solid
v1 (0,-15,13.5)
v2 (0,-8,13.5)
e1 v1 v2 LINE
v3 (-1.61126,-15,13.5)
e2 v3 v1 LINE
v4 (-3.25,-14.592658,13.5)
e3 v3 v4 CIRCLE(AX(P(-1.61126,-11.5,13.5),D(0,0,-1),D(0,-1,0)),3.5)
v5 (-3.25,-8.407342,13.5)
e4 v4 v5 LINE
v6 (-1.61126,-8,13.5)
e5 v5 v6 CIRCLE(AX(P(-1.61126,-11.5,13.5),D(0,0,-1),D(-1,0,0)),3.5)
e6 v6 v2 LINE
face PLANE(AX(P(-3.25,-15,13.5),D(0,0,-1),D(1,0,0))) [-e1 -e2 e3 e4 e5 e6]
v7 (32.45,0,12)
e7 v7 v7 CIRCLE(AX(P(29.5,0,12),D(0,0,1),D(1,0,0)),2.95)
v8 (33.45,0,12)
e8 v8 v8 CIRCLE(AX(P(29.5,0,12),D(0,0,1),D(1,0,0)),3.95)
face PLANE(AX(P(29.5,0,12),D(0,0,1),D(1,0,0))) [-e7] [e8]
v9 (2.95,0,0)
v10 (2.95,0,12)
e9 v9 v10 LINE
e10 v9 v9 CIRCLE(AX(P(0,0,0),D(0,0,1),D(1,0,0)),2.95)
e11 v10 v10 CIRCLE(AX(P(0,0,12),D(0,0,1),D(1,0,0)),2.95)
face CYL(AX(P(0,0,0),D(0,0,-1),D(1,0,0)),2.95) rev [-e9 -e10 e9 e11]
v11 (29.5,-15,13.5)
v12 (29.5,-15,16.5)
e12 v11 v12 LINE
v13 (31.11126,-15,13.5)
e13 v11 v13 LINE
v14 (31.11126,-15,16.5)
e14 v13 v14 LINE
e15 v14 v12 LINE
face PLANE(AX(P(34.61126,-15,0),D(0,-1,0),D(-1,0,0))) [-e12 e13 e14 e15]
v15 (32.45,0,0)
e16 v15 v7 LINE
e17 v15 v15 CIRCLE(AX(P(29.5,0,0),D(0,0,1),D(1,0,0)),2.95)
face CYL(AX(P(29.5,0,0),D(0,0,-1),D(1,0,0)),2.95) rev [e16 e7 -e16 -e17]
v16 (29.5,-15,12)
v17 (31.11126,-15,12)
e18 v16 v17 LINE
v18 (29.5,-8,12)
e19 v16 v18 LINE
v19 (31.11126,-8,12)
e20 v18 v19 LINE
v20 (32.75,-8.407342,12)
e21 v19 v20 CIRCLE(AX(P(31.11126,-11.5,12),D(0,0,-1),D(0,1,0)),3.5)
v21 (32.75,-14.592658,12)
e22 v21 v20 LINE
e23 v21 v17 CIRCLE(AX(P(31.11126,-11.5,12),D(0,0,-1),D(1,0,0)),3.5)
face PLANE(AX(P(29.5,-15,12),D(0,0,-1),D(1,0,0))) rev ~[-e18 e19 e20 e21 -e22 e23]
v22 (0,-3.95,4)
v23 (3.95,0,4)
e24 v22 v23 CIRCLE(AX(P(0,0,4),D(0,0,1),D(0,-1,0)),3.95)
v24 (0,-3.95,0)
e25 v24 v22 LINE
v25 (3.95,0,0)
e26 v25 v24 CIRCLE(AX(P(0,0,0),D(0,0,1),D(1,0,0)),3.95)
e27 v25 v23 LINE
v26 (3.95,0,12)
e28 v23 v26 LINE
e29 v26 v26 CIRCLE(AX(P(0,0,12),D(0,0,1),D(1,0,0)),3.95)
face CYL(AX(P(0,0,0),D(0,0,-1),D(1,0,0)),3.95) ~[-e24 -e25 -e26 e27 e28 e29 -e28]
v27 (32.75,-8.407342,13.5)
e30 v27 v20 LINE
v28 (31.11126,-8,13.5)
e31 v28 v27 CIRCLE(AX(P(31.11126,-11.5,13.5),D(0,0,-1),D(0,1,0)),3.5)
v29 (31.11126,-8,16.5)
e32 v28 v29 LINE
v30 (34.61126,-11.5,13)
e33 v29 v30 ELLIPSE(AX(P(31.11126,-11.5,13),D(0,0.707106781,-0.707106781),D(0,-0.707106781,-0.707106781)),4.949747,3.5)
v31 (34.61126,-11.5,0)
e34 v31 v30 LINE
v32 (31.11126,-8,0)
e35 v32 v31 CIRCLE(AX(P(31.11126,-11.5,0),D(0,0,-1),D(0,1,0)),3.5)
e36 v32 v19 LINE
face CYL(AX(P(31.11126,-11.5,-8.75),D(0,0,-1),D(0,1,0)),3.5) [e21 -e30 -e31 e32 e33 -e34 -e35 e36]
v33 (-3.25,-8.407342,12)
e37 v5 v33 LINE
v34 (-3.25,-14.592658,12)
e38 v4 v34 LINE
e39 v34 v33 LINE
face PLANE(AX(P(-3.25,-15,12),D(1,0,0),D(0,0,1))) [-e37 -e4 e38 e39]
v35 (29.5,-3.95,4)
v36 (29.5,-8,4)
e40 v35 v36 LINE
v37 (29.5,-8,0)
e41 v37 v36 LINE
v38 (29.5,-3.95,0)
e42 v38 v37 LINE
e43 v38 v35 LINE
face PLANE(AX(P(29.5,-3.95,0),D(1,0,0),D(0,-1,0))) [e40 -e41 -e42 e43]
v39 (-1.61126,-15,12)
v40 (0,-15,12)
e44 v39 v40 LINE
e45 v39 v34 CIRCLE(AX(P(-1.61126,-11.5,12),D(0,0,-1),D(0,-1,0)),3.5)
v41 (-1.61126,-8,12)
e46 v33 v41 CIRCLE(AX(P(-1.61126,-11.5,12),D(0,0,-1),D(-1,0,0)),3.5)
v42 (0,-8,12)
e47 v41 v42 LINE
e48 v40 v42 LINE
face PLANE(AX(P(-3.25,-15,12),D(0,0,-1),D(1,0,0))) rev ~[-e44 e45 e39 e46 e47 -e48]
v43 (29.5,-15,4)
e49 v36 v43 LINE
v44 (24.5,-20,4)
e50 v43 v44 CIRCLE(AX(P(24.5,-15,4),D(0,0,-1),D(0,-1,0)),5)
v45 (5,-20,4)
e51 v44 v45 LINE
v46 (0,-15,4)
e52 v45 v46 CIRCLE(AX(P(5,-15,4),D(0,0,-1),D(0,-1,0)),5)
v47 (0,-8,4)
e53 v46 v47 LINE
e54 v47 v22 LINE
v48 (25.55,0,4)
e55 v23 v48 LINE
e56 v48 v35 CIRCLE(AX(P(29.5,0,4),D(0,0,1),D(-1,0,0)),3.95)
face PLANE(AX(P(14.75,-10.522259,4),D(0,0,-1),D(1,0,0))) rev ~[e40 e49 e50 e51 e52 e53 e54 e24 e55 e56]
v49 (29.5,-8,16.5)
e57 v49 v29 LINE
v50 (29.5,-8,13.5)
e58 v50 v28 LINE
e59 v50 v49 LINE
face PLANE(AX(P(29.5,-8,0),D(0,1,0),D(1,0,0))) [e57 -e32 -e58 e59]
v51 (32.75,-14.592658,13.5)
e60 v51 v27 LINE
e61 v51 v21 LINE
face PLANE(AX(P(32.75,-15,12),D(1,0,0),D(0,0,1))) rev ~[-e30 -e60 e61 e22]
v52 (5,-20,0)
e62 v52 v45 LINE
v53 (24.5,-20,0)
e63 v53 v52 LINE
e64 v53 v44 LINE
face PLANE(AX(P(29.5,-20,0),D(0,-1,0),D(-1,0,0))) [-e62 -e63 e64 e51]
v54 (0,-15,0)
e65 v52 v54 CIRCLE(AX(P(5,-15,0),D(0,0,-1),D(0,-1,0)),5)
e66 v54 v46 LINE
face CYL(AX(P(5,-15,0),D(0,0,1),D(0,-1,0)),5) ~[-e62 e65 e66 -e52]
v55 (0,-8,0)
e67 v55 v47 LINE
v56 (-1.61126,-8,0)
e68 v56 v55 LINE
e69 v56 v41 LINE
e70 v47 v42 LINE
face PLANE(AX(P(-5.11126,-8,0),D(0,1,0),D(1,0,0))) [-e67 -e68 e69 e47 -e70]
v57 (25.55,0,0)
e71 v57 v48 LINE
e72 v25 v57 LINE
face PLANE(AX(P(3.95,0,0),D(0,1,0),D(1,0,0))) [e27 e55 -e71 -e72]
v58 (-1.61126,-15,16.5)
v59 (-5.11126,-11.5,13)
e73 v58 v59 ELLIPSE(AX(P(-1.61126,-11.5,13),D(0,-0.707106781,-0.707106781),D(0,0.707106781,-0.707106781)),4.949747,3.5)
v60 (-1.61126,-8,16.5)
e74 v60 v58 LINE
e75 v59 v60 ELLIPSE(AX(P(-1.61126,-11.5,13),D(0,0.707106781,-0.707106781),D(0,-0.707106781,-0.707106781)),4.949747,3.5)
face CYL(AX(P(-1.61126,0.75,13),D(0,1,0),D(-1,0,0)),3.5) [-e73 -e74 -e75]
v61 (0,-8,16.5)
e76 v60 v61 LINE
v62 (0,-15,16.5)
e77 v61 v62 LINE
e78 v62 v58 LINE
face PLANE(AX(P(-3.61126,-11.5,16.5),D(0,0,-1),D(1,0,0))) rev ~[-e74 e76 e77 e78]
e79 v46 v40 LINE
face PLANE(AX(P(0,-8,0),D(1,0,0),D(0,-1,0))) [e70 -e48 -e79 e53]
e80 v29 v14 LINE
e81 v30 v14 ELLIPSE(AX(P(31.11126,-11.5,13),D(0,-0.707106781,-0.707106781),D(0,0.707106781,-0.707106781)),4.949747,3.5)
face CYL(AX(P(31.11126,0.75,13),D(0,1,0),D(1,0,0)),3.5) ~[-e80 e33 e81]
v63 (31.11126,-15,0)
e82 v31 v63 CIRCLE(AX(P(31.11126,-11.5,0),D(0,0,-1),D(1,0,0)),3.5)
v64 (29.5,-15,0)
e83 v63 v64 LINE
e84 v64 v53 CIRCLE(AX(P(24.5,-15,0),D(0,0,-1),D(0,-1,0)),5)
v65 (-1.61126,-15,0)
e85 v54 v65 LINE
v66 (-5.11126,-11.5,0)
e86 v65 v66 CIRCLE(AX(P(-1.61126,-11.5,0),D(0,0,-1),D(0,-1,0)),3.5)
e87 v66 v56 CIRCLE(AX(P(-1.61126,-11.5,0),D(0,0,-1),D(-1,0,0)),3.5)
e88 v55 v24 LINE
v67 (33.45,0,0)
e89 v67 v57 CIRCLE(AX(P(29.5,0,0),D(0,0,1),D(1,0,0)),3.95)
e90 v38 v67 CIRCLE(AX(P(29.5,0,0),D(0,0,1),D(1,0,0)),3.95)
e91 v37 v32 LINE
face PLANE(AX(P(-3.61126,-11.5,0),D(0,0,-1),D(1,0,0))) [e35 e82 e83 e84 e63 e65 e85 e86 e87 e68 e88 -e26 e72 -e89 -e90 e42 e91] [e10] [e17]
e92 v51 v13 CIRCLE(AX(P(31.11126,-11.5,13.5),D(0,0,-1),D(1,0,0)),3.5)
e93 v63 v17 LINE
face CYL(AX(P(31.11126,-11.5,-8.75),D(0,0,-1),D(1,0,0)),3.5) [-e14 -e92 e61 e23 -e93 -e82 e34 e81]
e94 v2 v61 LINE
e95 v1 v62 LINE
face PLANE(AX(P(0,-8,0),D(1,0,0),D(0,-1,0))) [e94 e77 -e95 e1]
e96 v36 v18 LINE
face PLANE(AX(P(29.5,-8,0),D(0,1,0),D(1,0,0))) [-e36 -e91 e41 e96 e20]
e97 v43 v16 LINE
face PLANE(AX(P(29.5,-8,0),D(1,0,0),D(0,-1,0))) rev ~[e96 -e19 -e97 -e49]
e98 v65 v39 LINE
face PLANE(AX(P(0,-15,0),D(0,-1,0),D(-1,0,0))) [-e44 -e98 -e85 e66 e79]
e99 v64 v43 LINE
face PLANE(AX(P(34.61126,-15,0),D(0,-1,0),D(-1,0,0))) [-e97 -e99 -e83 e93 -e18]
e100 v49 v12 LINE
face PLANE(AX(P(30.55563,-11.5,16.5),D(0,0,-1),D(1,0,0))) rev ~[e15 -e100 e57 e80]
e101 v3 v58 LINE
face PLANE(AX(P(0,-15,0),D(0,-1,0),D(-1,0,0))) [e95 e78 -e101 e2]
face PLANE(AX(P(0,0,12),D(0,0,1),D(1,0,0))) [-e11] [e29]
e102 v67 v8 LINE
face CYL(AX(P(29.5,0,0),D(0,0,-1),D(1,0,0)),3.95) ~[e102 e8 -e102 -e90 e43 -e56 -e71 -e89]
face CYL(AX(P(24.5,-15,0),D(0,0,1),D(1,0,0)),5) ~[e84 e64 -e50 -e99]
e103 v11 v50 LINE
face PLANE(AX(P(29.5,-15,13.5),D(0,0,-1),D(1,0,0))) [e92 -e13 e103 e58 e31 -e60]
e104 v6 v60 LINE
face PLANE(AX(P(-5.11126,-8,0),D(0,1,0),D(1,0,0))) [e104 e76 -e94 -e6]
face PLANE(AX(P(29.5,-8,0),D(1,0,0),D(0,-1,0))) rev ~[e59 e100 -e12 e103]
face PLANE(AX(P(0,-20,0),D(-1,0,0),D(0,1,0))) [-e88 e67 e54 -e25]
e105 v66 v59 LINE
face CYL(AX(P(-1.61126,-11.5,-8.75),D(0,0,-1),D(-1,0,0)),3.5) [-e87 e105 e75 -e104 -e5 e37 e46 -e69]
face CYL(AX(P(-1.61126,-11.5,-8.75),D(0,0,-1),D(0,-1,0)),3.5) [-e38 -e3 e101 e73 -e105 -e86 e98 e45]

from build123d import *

# Parameters (mm, degrees)
F0_R         = 3.95
F0_R_2       = 2.95
F1_DEPTH     = 12
F3_DEPTH     = 4
F5_R         = 5
F6_W         = 3
F6_H         = 7
F6_W_2       = 2.1112600537
F7_DEPTH     = 16.5
F8_W         = 3.25
F8_H         = 1.5
F9_DEPTH     = 7
F10_T1_DEPTH = 34
F10_T3_DEPTH = 24.5


# Not quite as in the source:
# - a fillet or chamfer that OpenCascade refuses, or shapes differently, is made with other operations: its cross-section is extruded or revolved along the edge and cut away or added


with BuildPart() as f1:
    # F0 (on Top) → F1 (new body)
    with BuildSketch(Plane.XY):
        Circle(F0_R)
        Circle(F0_R_2, mode=Mode.SUBTRACT)
    extrude(amount=F1_DEPTH)


with BuildPart() as f1b:
    # F0 (on Top) → F1, piece 2 (new body)
    with BuildSketch(Plane.XY):
        with Locations((29.5, 0)):
            Circle(F0_R)
        with Locations((29.5, 0)):
            Circle(F0_R_2, mode=Mode.SUBTRACT)
    extrude(amount=F1_DEPTH)


with BuildPart() as f3:
    # F2 (on face) → F3 (new body)
    with BuildSketch(Plane(origin=(0, 0, 0), x_dir=(1, 0, 0), z_dir=(0, 0, -1))):
        with BuildLine():
            ThreePointArc((0, 3.95), (2.7930717857, 2.7930717857), (3.95, 0))
            Line((3.95, 0), (25.55, 0))
            ThreePointArc((25.55, 0), (26.7069282143, 2.7930717857), (29.5, 3.95))
            Line((29.5, 3.95), (29.5, 20))
            Line((29.5, 20), (0, 20))
            Line((0, 20), (0, 3.95))
        make_face()
    extrude(amount=-F3_DEPTH)

    # F4: union F1, F1b
    add(f1.part)
    add(f1b.part)

    # F5
    f5_edges = [f3.edges().sort_by_distance(p)[0] for p in [
        (0, -20, 2),
        (29.5, -20, 2),
    ]]
    fillet(f5_edges, radius=F5_R)

    # F6 (on face) → F7 (join)
    with BuildSketch(Plane(origin=(0, 0, 0), x_dir=(1, 0, 0), z_dir=(0, 0, -1))):
        with Locations((-3.6112600537, 11.5)):
            Rectangle(F6_W, F6_H)
        with Locations((-1.0556300269, 11.5)):
            Rectangle(F6_W_2, F6_H)
        with Locations((30.5556300269, 11.5)):
            Rectangle(F6_W_2, F6_H)
        with Locations((33.1112600537, 11.5)):
            Rectangle(F6_W, F6_H)
    extrude(amount=-F7_DEPTH)

    # F8 (on face) → F9 (cut, through all)
    with BuildSketch(Plane.XZ.offset(15)):
        with Locations((-1.625, 12.75)):
            Rectangle(F8_W, F8_H)
        with Locations((31.125, 12.75)):
            Rectangle(F8_W, F8_H)
    extrude(amount=-F9_DEPTH, mode=Mode.SUBTRACT)

    # F10: fillet of radius 3.5 on 6 edges, made by hand

    # F10_s2 → F10_t1 (cut)
    with BuildSketch(Plane.XY.offset(-8.75)):
        with BuildLine():
            ThreePointArc((-1.6112600537, -15), (-4.0861337879, -13.9748737342), (-5.1112600537, -11.5))
            Line((-5.1112600537, -11.5), (-5.1112600537, -15))
            Line((-5.1112600537, -15), (-1.6112600537, -15))
        make_face()
        with BuildLine():
            ThreePointArc((-5.1112600537, -11.5), (-4.0861337879, -9.0251262658), (-1.6112600537, -8))
            Line((-1.6112600537, -8), (-5.1112600537, -8))
            Line((-5.1112600537, -8), (-5.1112600537, -11.5))
        make_face()
        with BuildLine():
            ThreePointArc((34.6112600537, -11.5), (33.5861337879, -13.9748737342), (31.1112600537, -15))
            Line((31.1112600537, -15), (34.6112600537, -15))
            Line((34.6112600537, -15), (34.6112600537, -11.5))
        make_face()
        with BuildLine():
            ThreePointArc((31.1112600537, -8), (33.5861337879, -9.0251262658), (34.6112600537, -11.5))
            Line((34.6112600537, -11.5), (34.6112600537, -8))
            Line((34.6112600537, -8), (31.1112600537, -8))
        make_face()
    extrude(amount=F10_T1_DEPTH, mode=Mode.SUBTRACT)

    # F10_s4 → F10_t3 (cut)
    with BuildSketch(Plane.XZ.offset(-0.75)):
        with BuildLine():
            ThreePointArc((34.6112600537, 13), (33.5861337879, 15.4748737342), (31.1112600537, 16.5))
            Line((31.1112600537, 16.5), (34.6112600537, 16.5))
            Line((34.6112600537, 16.5), (34.6112600537, 13))
        make_face()
        with BuildLine():
            ThreePointArc((-5.1112600537, 13), (-4.0861337879, 15.4748737342), (-1.6112600537, 16.5))
            Line((-1.6112600537, 16.5), (-5.1112600537, 16.5))
            Line((-5.1112600537, 16.5), (-5.1112600537, 13))
        make_face()
    extrude(amount=F10_T3_DEPTH, mode=Mode.SUBTRACT)


solid = f3.part
